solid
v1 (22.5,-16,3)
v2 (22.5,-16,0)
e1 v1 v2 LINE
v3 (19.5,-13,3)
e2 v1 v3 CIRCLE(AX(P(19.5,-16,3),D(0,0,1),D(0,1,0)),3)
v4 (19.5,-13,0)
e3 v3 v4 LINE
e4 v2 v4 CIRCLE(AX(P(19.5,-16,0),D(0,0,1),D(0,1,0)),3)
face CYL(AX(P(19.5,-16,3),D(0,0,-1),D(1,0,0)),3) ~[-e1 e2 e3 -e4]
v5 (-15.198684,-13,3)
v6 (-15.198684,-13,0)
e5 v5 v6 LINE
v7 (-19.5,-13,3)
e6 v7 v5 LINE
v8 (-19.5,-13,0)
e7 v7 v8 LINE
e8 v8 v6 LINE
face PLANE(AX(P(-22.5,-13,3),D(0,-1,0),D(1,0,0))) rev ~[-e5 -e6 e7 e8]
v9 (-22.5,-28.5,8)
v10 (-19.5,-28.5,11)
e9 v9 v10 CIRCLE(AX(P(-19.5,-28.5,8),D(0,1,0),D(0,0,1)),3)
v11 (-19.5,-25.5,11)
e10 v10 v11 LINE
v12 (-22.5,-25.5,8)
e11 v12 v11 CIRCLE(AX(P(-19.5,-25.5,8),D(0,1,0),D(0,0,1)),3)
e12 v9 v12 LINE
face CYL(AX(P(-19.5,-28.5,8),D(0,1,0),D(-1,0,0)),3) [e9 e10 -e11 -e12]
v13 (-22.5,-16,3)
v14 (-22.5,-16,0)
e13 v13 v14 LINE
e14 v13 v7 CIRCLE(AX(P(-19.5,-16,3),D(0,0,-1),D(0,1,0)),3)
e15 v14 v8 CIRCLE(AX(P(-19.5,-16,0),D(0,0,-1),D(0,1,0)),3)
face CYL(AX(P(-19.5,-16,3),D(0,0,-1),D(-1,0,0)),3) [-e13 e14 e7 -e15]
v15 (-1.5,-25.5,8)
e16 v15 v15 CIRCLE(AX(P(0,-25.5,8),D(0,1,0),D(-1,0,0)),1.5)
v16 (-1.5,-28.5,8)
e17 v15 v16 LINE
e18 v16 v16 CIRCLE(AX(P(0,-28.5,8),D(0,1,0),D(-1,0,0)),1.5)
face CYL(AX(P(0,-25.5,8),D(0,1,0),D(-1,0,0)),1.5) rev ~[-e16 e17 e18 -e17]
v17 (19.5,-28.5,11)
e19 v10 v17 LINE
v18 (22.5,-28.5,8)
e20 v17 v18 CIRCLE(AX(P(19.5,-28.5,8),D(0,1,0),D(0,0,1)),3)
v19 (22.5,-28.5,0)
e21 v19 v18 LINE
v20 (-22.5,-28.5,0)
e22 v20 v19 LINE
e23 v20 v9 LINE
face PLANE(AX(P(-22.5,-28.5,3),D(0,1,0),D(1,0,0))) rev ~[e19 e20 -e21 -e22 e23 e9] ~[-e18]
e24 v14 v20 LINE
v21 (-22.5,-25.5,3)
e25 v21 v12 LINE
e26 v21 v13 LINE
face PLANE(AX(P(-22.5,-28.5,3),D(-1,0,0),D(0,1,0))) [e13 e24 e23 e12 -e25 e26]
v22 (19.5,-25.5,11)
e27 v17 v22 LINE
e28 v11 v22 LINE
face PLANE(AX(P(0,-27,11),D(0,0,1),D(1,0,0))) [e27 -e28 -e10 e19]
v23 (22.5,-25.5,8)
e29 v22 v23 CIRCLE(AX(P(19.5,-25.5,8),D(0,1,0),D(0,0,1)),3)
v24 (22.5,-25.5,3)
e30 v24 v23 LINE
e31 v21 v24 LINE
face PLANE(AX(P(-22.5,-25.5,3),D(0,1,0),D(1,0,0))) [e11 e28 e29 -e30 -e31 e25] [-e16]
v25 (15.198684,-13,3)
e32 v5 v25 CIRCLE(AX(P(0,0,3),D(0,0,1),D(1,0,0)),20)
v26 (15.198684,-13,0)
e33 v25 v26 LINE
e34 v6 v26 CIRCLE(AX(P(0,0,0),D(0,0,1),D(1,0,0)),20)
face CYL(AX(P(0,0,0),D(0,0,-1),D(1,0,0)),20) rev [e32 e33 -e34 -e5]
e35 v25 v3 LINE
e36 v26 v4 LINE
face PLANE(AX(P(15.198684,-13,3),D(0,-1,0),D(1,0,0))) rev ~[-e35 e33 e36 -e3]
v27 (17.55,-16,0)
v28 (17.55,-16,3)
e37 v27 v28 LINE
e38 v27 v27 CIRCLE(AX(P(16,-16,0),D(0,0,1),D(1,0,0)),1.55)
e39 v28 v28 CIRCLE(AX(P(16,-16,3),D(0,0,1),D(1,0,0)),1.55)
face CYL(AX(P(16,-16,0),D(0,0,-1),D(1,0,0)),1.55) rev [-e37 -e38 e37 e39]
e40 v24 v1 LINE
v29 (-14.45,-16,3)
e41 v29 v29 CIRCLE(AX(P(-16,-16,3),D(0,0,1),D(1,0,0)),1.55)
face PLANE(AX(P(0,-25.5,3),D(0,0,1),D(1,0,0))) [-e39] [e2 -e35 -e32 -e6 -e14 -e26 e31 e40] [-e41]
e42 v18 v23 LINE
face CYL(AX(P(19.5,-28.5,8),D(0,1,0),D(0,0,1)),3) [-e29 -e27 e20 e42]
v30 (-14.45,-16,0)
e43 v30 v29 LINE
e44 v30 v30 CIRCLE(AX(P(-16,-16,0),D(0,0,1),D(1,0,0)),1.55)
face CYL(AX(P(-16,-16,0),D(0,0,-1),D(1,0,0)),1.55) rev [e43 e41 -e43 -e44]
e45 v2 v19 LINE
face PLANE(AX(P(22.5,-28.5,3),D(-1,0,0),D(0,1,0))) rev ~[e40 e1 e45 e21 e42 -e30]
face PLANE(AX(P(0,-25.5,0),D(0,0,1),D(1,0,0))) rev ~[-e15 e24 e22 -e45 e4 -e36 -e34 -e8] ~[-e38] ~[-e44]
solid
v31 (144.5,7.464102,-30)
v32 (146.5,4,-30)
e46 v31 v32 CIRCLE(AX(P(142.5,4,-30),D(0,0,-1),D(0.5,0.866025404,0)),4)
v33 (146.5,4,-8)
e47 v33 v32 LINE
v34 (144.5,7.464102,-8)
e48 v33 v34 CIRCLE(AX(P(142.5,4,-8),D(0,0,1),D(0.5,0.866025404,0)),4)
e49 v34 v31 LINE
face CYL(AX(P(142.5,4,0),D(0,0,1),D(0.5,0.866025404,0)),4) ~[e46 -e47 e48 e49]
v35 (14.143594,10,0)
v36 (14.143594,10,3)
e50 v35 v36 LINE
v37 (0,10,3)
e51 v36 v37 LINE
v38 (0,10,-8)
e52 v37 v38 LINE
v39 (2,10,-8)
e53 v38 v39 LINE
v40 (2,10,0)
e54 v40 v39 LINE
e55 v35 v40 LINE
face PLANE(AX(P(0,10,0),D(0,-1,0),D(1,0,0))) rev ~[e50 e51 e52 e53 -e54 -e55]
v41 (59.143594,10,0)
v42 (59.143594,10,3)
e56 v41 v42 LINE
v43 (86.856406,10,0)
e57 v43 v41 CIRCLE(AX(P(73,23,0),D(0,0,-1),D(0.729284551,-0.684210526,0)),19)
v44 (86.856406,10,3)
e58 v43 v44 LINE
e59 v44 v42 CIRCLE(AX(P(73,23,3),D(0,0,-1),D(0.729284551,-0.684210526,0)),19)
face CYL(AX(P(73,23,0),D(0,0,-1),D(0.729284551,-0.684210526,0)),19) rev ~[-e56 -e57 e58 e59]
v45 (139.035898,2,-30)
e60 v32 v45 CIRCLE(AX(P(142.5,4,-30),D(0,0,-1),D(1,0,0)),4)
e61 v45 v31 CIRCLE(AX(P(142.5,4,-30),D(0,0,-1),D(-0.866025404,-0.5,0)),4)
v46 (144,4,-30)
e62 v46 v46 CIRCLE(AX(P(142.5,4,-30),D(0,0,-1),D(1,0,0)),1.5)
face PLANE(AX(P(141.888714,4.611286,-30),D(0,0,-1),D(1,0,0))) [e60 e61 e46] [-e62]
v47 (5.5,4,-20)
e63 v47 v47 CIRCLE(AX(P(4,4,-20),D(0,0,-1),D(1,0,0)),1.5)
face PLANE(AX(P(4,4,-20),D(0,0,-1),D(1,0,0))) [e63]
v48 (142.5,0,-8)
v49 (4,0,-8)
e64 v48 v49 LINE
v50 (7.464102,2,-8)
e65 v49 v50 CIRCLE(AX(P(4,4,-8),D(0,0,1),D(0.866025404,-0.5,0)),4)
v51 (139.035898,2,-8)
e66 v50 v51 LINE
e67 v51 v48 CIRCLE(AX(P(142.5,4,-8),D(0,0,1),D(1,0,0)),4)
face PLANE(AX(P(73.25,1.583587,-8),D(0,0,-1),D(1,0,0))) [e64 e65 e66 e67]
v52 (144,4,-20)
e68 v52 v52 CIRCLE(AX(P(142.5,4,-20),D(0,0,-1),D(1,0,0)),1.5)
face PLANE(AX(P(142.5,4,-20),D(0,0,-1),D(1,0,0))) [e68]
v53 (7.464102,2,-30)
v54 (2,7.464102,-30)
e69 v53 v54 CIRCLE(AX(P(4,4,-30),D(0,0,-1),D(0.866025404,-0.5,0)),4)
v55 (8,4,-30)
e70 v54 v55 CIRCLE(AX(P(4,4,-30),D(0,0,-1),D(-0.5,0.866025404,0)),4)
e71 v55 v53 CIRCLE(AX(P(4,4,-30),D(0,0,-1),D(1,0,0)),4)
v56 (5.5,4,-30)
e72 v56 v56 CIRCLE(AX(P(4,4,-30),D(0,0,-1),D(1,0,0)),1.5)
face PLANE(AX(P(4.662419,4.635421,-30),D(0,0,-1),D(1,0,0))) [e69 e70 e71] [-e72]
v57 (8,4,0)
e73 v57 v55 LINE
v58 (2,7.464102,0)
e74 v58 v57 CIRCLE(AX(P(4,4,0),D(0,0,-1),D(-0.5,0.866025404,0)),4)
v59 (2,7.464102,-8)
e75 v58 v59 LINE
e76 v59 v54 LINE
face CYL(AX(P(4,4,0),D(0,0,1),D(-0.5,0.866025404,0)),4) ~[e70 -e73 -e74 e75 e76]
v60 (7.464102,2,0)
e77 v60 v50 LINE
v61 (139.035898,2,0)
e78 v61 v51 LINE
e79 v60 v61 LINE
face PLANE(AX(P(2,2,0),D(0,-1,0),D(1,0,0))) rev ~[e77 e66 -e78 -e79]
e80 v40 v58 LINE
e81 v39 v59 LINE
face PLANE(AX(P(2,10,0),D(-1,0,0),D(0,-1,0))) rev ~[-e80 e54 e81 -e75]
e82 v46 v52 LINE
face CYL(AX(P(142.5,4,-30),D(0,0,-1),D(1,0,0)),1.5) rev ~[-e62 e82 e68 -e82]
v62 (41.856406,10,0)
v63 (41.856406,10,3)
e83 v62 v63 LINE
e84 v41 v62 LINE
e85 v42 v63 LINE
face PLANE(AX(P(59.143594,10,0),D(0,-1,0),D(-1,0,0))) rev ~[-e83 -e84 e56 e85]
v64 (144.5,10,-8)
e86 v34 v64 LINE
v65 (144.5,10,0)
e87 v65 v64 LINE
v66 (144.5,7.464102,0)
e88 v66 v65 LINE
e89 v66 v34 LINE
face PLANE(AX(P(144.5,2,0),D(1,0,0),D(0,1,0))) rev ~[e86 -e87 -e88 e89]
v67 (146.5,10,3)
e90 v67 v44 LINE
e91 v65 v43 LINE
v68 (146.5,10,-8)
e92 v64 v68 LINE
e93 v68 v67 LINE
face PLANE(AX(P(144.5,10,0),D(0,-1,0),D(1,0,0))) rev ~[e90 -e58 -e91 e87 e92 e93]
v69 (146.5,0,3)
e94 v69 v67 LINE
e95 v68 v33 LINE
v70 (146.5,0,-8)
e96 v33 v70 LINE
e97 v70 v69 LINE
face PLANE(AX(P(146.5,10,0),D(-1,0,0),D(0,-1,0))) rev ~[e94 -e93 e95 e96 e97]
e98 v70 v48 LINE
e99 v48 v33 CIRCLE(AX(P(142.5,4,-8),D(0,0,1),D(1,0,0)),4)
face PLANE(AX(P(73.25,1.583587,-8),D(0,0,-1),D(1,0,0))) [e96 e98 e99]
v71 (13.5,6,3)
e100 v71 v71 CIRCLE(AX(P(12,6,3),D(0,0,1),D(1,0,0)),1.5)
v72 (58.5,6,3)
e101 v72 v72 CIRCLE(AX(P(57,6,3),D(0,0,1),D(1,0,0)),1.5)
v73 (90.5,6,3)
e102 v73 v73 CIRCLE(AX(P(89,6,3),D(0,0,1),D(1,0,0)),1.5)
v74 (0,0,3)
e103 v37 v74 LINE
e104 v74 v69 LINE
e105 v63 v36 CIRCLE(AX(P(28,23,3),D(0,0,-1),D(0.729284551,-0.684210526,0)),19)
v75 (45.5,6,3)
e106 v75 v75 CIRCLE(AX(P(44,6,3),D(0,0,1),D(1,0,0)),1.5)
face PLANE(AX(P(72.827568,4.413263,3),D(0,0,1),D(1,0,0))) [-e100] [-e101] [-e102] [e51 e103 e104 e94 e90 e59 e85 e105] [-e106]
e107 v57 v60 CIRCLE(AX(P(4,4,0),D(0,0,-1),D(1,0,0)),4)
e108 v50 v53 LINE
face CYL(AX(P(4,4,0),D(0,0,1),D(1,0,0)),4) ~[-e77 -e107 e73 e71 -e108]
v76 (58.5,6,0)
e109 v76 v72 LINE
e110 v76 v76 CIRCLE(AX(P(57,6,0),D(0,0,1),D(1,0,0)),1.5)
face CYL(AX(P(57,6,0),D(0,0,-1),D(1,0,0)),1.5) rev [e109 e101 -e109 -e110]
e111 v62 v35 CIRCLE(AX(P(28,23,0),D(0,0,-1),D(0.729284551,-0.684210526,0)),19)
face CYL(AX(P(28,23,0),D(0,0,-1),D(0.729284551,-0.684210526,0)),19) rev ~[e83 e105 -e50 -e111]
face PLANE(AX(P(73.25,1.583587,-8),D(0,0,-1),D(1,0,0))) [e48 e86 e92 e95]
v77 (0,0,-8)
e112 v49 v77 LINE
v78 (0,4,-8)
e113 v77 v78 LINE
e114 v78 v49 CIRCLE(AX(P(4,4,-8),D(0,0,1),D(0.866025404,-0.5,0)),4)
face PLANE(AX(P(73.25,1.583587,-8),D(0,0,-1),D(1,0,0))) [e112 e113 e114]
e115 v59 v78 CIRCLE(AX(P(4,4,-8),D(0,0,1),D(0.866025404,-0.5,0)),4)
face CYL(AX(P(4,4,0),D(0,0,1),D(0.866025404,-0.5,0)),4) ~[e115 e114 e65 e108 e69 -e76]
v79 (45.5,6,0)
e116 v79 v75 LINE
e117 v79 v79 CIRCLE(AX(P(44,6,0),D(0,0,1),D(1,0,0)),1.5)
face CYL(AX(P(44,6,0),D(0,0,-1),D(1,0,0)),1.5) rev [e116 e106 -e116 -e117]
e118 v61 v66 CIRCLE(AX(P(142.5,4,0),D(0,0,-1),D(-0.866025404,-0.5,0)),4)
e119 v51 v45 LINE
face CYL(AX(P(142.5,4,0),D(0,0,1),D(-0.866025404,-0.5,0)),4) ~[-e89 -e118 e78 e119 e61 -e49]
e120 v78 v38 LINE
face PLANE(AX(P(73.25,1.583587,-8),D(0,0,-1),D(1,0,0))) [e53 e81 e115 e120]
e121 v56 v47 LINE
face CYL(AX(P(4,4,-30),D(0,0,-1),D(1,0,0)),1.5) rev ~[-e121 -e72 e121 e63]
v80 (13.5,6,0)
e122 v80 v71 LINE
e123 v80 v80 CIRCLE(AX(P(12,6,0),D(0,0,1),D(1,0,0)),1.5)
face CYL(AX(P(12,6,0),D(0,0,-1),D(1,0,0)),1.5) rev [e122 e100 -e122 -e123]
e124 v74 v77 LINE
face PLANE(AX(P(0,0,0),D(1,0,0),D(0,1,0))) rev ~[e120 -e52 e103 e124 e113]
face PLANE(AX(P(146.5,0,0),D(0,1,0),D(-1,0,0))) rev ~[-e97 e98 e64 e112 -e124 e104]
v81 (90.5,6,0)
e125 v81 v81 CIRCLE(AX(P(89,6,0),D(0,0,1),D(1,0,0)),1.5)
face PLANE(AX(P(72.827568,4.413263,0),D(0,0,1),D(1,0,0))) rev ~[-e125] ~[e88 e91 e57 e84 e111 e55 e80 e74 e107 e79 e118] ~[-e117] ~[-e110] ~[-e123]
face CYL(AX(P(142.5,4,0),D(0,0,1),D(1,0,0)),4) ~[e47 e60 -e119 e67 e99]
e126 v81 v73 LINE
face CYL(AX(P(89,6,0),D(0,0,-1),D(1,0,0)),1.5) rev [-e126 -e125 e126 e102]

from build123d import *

# Parameters (mm, degrees)
F0_R      = 1.5
F1_DEPTH  = 3
F3_DEPTH  = 8
F5_DEPTH  = 30
F6_R      = 1.5
F7_DEPTH  = 10
F8_W      = 45
F8_H      = 45
F8_R      = 1.55
F8_R_2    = 20
F9_DEPTH  = 3
F10_W     = 45
F10_H     = 6
F11_DEPTH = 3
F12_W     = 45
F12_H     = 3
F13_DEPTH = 8
F14_R     = 1.5
F15_DEPTH = 3.001
F16_R     = 1.55
F17_DEPTH = 33.001
F18_R     = 3


with BuildPart() as f1:
    # F0 (on Top) → F1 (new body)
    with BuildSketch(Plane.XY):
        with BuildLine():
            Line((0, 10), (0, 0))
            Line((0, 0), (146.5, 0))
            Line((146.5, 0), (146.5, 10))
            Line((146.5, 10), (86.8564064606, 10))
            ThreePointArc((86.8564064606, 10), (73, 4), (59.1435935394, 10))
            Line((59.1435935394, 10), (41.8564064606, 10))
            ThreePointArc((41.8564064606, 10), (28, 4), (14.1435935394, 10))
            Line((14.1435935394, 10), (0, 10))
        make_face()
        with Locations((12, 6)):
            Circle(F0_R, mode=Mode.SUBTRACT)
        with Locations((44, 6)):
            Circle(F0_R, mode=Mode.SUBTRACT)
        with Locations((57, 6)):
            Circle(F0_R, mode=Mode.SUBTRACT)
        with Locations((89, 6)):
            Circle(F0_R, mode=Mode.SUBTRACT)
    extrude(amount=F1_DEPTH)

    # F2 (on face) → F3 (join)
    with BuildSketch(Plane(origin=(0, 0, 0), x_dir=(1, 0, 0), z_dir=(0, 0, -1))):
        Polygon((146.5, 0), (0, 0), (0, -10), (2, -10), (2, -2), (144.5, -2), (144.5, -10), (146.5, -10), align=None)
    extrude(amount=F3_DEPTH)

    # F4 (on face) → F5 (join)
    with BuildSketch(Plane(origin=(0, 0, 0), x_dir=(1, 0, 0), z_dir=(0, 0, -1))):
        with BuildLine():
            ThreePointArc((8, -4), (7.8637033052, -2.9647238196), (7.4641016151, -2))
            Line((7.4641016151, -2), (2, -2))
            Line((2, -2), (2, -7.4641016151))
            ThreePointArc((2, -7.4641016151), (6, -7.4641016151), (8, -4))
        make_face()
        with BuildLine():
            Line((144.5, -2), (139.0358983849, -2))
            ThreePointArc((139.0358983849, -2), (139.6715728753, -6.8284271247), (144.5, -7.4641016151))
            Line((144.5, -7.4641016151), (144.5, -2))
        make_face()
        with BuildLine():
            Line((2, -2), (7.4641016151, -2))
            ThreePointArc((7.4641016151, -2), (1.1715728753, -1.1715728753), (2, -7.4641016151))
            Line((2, -7.4641016151), (2, -2))
        make_face()
        with BuildLine():
            ThreePointArc((144.5, -7.4641016151), (145.9641016151, -6), (146.5, -4))
            ThreePointArc((146.5, -4), (143.5352761804, -0.1362966948), (139.0358983849, -2))
            Line((139.0358983849, -2), (144.5, -2))
            Line((144.5, -2), (144.5, -7.4641016151))
        make_face()
    extrude(amount=F5_DEPTH)

    # F6 (on face) → F7 (cut)
    with BuildSketch(Plane(origin=(0, 0, -30), x_dir=(1, 0, 0), z_dir=(0, 0, -1))):
        with Locations((142.5, -4)):
            Circle(F6_R)
        with Locations((4, -4)):
            Circle(F6_R)
    extrude(amount=-F7_DEPTH, mode=Mode.SUBTRACT)


with BuildPart() as f9:
    # F8 (on Top) → F9 (new body)
    with BuildSketch(Plane.XY):
        Rectangle(F8_W, F8_H)
        with Locations((-16, -16)):
            Circle(F8_R, mode=Mode.SUBTRACT)
        with Locations((16, -16)):
            Circle(F8_R, mode=Mode.SUBTRACT)
        with Locations((-16, 16)):
            Circle(F8_R, mode=Mode.SUBTRACT)
        Circle(F8_R_2, mode=Mode.SUBTRACT)
        with Locations((16, 16)):
            Circle(F8_R, mode=Mode.SUBTRACT)
    extrude(amount=F9_DEPTH)

    # F10 (on Top) → F11 (join, through all)
    with BuildSketch(Plane.XY):
        with Locations((0, -25.5)):
            Rectangle(F10_W, F10_H)
    extrude(amount=F11_DEPTH)

    # F12 (on face) → F13 (join)
    with BuildSketch(Plane.XY.offset(3)):
        with Locations((0, -27)):
            Rectangle(F12_W, F12_H)
    extrude(amount=F13_DEPTH)

    # F14 (on face) → F15 (cut, through all)
    with BuildSketch(Plane(origin=(0, -25.5, 0), x_dir=(-1, 0, 0), z_dir=(0, 1, 0))):
        with Locations((0, 8)):
            Circle(F14_R)
    extrude(amount=-F15_DEPTH, mode=Mode.SUBTRACT)

    # F16 (on face) → F17 (cut, through all)
    with BuildSketch(Plane.XY.offset(3)):
        with BuildLine():
            Line((-22.5, 22.5), (-22.5, -13))
            Line((-22.5, -13), (-15.1986841536, -13))
            ThreePointArc((-15.1986841536, -13), (-6.9291527956, 18.7613123618), (20, 0))
            ThreePointArc((20, 0), (18.7613123618, -6.9291527956), (15.1986841536, -13))
            Line((15.1986841536, -13), (22.5, -13))
            Line((22.5, -13), (22.5, 22.5))
            Line((22.5, 22.5), (-22.5, 22.5))
        make_face()
        with Locations((-16, 16)):
            Circle(F16_R, mode=Mode.SUBTRACT)
        with Locations((16, 16)):
            Circle(F16_R, mode=Mode.SUBTRACT)
    extrude(amount=-F17_DEPTH, mode=Mode.SUBTRACT)

    # F18
    f18_edges = [f9.edges().sort_by_distance(p)[0] for p in [
        (22.5, -13, 1.5),
        (-22.5, -13, 1.5),
        (22.5, -27, 11),
        (-22.5, -27, 11),
    ]]
    fillet(f18_edges, radius=F18_R)


solid = Compound([f1.part, f9.part])
